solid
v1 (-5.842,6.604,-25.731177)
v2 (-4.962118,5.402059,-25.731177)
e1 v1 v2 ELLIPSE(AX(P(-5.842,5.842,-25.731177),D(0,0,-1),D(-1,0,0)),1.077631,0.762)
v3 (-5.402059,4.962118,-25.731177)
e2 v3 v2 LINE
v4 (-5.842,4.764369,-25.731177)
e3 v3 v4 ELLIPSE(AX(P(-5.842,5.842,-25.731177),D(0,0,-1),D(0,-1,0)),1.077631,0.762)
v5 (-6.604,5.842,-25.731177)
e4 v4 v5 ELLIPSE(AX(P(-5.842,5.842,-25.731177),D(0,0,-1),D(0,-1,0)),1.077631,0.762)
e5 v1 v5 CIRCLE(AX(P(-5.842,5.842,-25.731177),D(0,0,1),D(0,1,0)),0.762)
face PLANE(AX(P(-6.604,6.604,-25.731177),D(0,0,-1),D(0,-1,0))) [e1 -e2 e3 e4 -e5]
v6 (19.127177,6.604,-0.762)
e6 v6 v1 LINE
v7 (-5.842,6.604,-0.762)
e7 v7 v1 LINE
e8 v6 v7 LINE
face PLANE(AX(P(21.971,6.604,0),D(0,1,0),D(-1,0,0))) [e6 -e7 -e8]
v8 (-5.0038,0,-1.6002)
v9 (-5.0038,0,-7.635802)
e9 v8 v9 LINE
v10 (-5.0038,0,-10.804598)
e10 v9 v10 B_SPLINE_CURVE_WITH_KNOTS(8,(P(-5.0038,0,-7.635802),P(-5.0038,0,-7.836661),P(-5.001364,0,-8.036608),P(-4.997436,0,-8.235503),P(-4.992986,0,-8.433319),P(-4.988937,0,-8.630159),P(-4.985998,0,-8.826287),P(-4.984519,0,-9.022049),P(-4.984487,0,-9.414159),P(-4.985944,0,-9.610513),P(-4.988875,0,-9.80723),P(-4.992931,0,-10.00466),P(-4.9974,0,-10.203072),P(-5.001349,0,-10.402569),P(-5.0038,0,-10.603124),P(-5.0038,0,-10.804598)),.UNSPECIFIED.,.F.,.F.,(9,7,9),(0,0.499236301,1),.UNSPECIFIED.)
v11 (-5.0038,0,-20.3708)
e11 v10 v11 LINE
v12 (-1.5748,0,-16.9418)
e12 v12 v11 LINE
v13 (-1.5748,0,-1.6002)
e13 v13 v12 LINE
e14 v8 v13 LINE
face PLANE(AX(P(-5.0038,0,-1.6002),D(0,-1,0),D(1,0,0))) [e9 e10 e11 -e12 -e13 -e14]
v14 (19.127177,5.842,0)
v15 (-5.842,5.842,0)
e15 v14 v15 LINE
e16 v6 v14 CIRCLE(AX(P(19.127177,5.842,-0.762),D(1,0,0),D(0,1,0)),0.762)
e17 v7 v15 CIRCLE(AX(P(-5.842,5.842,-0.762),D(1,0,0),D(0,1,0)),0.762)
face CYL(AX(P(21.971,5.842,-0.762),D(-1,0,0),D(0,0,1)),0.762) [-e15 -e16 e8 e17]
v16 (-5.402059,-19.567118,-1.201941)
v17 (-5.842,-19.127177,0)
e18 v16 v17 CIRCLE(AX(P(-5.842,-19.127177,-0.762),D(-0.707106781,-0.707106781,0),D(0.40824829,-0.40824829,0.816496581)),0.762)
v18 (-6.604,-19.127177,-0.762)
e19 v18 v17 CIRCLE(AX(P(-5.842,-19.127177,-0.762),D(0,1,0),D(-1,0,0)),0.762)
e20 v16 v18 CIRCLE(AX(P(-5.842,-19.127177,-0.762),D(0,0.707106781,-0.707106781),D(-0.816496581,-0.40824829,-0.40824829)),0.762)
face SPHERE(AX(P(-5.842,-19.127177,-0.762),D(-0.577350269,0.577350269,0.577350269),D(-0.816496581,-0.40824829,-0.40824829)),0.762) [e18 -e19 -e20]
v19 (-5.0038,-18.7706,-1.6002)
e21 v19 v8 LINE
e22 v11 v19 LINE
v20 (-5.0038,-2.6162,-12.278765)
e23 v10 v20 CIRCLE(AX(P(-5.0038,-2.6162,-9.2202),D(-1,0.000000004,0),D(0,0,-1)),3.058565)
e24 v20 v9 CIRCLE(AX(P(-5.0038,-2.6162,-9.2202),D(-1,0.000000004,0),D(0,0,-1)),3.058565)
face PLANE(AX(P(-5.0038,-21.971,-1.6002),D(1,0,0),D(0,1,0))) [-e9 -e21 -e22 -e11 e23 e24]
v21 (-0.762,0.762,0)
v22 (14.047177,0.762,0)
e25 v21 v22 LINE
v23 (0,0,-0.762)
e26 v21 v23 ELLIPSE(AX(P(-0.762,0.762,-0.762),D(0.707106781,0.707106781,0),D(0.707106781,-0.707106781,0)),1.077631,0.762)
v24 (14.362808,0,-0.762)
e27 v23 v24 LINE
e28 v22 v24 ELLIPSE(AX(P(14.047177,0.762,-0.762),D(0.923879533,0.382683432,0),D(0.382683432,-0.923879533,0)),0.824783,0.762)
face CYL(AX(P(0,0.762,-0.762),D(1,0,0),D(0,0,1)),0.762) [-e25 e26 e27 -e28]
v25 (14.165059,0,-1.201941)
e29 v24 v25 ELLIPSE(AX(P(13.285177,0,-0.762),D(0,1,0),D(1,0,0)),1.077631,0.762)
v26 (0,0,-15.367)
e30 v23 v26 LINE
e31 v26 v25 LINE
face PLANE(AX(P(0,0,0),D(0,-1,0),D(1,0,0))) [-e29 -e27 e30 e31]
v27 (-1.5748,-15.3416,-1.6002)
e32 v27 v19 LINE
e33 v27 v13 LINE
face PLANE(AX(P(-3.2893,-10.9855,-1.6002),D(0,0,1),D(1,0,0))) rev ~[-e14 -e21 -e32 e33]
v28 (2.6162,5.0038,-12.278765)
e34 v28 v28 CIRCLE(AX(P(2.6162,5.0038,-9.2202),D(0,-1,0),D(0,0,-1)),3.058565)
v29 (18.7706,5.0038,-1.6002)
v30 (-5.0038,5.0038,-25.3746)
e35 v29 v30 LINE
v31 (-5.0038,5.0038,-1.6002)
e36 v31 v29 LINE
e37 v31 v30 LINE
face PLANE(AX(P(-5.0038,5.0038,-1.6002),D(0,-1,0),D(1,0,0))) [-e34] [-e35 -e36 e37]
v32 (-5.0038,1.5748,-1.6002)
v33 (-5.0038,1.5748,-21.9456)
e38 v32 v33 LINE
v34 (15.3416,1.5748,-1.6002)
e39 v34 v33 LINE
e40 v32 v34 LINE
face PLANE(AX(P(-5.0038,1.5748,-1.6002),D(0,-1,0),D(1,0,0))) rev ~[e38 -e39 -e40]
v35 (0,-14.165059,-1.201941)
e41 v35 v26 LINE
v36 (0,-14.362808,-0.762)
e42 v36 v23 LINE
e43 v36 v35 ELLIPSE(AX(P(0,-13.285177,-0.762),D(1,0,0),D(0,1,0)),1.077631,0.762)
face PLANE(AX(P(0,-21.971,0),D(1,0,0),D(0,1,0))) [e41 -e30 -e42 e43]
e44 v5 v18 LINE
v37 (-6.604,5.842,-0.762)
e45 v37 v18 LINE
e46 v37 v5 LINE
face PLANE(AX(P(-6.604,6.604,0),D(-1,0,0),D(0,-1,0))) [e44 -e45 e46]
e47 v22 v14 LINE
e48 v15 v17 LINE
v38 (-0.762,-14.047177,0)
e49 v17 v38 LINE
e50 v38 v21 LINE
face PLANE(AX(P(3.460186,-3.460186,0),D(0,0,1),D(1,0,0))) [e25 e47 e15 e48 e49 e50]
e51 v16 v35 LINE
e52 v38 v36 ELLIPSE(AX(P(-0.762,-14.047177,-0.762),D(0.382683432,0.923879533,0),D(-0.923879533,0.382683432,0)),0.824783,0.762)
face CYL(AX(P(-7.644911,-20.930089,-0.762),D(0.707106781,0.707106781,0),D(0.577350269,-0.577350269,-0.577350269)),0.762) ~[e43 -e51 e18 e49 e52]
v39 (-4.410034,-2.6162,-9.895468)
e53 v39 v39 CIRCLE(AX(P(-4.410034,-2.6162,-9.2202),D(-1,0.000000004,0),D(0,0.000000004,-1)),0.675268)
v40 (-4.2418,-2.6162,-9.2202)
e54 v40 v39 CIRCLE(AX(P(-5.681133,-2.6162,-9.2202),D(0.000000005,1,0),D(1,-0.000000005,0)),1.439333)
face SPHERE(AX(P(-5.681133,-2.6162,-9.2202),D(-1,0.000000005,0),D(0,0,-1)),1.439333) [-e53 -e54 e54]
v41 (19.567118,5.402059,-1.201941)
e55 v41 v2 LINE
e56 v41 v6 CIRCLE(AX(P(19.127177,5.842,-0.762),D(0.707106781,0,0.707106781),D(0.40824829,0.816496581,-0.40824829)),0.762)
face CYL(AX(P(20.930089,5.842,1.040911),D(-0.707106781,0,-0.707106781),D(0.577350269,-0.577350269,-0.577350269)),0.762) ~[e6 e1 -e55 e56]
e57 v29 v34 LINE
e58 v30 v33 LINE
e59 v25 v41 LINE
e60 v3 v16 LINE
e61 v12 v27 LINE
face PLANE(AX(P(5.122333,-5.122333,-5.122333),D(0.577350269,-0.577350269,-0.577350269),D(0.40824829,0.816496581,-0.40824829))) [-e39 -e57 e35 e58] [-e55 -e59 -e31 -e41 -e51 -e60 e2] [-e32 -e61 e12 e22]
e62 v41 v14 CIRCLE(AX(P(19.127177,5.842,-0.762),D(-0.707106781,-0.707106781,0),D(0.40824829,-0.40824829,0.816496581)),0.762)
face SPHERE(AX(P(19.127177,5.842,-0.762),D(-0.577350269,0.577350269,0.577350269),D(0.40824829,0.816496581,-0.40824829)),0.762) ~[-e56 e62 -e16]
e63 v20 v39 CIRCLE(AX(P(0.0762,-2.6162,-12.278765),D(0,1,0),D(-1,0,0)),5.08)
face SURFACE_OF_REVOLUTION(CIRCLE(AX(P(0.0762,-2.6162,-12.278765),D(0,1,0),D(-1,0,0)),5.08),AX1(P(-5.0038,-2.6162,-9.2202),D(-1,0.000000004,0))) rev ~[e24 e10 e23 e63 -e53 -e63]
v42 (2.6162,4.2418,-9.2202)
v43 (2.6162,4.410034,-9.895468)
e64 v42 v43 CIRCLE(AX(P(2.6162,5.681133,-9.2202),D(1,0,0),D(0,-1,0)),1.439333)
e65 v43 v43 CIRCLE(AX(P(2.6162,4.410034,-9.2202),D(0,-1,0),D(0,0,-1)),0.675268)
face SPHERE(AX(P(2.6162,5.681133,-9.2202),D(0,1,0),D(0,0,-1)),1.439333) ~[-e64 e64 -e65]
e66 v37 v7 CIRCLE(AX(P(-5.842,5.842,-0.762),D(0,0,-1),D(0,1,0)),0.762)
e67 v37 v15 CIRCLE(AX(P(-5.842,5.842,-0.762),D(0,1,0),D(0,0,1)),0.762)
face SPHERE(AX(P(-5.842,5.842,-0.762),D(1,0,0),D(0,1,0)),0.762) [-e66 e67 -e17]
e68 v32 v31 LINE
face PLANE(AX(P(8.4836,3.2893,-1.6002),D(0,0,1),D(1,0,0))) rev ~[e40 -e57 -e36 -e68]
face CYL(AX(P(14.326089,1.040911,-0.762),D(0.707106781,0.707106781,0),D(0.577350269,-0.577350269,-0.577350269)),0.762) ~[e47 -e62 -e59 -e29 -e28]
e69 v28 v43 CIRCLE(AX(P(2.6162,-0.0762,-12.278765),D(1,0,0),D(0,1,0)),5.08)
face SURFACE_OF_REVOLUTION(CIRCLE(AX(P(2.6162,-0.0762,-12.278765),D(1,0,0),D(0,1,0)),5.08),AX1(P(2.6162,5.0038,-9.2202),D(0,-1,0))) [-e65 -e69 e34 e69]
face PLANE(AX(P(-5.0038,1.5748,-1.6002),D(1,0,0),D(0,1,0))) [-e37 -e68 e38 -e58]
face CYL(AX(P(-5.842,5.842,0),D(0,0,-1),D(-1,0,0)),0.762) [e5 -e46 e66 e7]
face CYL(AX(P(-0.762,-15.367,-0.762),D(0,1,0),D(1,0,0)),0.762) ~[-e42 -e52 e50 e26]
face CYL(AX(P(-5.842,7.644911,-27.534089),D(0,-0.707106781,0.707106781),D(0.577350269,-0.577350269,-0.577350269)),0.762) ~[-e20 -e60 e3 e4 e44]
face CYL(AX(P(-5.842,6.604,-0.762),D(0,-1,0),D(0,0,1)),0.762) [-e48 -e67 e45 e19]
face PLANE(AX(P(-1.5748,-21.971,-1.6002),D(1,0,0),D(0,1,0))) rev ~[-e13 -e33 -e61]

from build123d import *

# Parameters (mm, degrees)
F1_DEPTH  = 28.575
F3_R      = 38.1
F4_DEPTH  = 32.9965678842
F6_W      = 26.9748
F6_H      = 3.429
F6_W_2    = 3.429
F6_H_2    = 21.971
F7_DEPTH  = 26.9758
F14_R     = 0.762
F15_W     = 1.8396307345
F15_H     = 3.0181135691
F16_DEPTH = 26.4941772846


# Not quite as in the source:
# - a fillet or chamfer that OpenCascade refuses, or shapes differently, is made with other operations: its cross-section is extruded or revolved along the edge and cut away or added
# - a pattern or mirror of a feature is missing from the dataset's text; its kind, count and spacing are read off the source's solid


with BuildPart() as f1:
    # F0 (on Top) → F1 (new body)
    with BuildSketch(Plane.XY):
        Polygon((0, -21.971), (0, 0), (21.971, 0), (21.971, 6.604), (-6.604, 6.604), (-6.604, -21.971), align=None)
    extrude(amount=-F1_DEPTH)

    # F3 (on 3pt) → F4 (cut, through all)
    with BuildSketch(Plane(origin=(5.1223333333, -5.1223333333, -5.1223333333), x_dir=(0.4082482905, 0.8164965809, -0.4082482905), z_dir=(0.5773502692, -0.5773502692, -0.5773502692))):
        Circle(F3_R)
    extrude(amount=F4_DEPTH, mode=Mode.SUBTRACT)

    # F6 (on offset) → F7 (cut, through all)
    with BuildSketch(Plane.XY.offset(-1.6002)):
        with Locations((8.4836, 3.2893)):
            Rectangle(F6_W, F6_H)
        with Locations((-3.2893, -10.9855)):
            Rectangle(F6_W_2, F6_H_2)
    extrude(amount=-F7_DEPTH, mode=Mode.SUBTRACT)

    # F9 (on offset) → F10 (revolve)
    with BuildSketch(Plane.YZ.offset(2.6162)):
        with BuildLine():
            ThreePointArc((4.2418, -9.2202), (4.4469151823, -9.9607308906), (5.0038, -10.4902))
            Line((5.0038, -10.4902), (5.0038, -9.2202))
            Line((5.0038, -9.2202), (4.2418, -9.2202))
        make_face()
    f10 = revolve(axis=Axis((2.6162, 4.6228, -9.2202), (0, -1, 0)))

    # F10_copies: F10 across plane
    add(f10.mirror(Plane(origin=(0, 0, 0), x_dir=(0.7071067796, -0.7071067828, 0), z_dir=(-0.7071067828, -0.7071067796, 0))))

    # F13: fillet of radius 5.08 on 3 edges, made by hand

    # F13_s1 → F13_t2 (revolve)
    with BuildSketch(Plane.YZ.offset(2.6162)):
        with BuildLine():
            ThreePointArc((5.0038, -12.278765023), (4.853123865, -11.0506908258), (4.4100337662, -9.8954676025))
            ThreePointArc((4.4100337662, -9.8954676025), (4.662543942, -10.2371346569), (5.0038, -10.4902))
            Line((5.0038, -10.4902), (5.0038, -12.278765023))
        make_face()
    revolve(axis=Axis((2.6162, 5.0038, -9.2202), (0, -1, 0)))

    # F13_s3 → F13_t4 (revolve)
    with BuildSketch(Plane.XZ.offset(2.6161999777)):
        with BuildLine():
            ThreePointArc((-5.0038, -12.2787650011), (-4.8531238674, -11.0506908133), (-4.4100337753, -9.8954675976))
            ThreePointArc((-4.4100337753, -9.8954675976), (-4.6625439517, -10.237134655), (-5.0038000116, -10.4902))
            Line((-5.0038000116, -10.4902), (-5.0038, -12.2787650011))
        make_face()
    revolve(axis=Axis((-5.0038000116, -2.6161999777, -9.2202), (-1, 4.4e-09, 0)))

    # F14
    f14_edges = [f1.edges().sort_by_distance(p)[0] for p in [
        (7.6835, 6.604, 0),
        (-6.604, 6.604, -14.2875),
        (7.6835, 6.604, -14.2875),
        (-6.604, -7.6835, 0),
        (-6.604, -7.6835, -14.2875),
        (18.669, 3.302, 0),
        (7.6835, 0, 0),
        (0, -7.6835, 0),
        (-3.302, -18.669, 0),
    ]]
    fillet(f14_edges, radius=F14_R)

    # F15 (on face) → F16 (cut, through all)
    with BuildSketch(Plane(origin=(-6.604, 0, 0), x_dir=(0, -1, 0), z_dir=(-1, 0, 0))):
        with Locations((-5.6841846327, -27.2402340692)):
            Rectangle(F15_W, F15_H)
    extrude(amount=-F16_DEPTH, mode=Mode.SUBTRACT)


solid = f1.part
